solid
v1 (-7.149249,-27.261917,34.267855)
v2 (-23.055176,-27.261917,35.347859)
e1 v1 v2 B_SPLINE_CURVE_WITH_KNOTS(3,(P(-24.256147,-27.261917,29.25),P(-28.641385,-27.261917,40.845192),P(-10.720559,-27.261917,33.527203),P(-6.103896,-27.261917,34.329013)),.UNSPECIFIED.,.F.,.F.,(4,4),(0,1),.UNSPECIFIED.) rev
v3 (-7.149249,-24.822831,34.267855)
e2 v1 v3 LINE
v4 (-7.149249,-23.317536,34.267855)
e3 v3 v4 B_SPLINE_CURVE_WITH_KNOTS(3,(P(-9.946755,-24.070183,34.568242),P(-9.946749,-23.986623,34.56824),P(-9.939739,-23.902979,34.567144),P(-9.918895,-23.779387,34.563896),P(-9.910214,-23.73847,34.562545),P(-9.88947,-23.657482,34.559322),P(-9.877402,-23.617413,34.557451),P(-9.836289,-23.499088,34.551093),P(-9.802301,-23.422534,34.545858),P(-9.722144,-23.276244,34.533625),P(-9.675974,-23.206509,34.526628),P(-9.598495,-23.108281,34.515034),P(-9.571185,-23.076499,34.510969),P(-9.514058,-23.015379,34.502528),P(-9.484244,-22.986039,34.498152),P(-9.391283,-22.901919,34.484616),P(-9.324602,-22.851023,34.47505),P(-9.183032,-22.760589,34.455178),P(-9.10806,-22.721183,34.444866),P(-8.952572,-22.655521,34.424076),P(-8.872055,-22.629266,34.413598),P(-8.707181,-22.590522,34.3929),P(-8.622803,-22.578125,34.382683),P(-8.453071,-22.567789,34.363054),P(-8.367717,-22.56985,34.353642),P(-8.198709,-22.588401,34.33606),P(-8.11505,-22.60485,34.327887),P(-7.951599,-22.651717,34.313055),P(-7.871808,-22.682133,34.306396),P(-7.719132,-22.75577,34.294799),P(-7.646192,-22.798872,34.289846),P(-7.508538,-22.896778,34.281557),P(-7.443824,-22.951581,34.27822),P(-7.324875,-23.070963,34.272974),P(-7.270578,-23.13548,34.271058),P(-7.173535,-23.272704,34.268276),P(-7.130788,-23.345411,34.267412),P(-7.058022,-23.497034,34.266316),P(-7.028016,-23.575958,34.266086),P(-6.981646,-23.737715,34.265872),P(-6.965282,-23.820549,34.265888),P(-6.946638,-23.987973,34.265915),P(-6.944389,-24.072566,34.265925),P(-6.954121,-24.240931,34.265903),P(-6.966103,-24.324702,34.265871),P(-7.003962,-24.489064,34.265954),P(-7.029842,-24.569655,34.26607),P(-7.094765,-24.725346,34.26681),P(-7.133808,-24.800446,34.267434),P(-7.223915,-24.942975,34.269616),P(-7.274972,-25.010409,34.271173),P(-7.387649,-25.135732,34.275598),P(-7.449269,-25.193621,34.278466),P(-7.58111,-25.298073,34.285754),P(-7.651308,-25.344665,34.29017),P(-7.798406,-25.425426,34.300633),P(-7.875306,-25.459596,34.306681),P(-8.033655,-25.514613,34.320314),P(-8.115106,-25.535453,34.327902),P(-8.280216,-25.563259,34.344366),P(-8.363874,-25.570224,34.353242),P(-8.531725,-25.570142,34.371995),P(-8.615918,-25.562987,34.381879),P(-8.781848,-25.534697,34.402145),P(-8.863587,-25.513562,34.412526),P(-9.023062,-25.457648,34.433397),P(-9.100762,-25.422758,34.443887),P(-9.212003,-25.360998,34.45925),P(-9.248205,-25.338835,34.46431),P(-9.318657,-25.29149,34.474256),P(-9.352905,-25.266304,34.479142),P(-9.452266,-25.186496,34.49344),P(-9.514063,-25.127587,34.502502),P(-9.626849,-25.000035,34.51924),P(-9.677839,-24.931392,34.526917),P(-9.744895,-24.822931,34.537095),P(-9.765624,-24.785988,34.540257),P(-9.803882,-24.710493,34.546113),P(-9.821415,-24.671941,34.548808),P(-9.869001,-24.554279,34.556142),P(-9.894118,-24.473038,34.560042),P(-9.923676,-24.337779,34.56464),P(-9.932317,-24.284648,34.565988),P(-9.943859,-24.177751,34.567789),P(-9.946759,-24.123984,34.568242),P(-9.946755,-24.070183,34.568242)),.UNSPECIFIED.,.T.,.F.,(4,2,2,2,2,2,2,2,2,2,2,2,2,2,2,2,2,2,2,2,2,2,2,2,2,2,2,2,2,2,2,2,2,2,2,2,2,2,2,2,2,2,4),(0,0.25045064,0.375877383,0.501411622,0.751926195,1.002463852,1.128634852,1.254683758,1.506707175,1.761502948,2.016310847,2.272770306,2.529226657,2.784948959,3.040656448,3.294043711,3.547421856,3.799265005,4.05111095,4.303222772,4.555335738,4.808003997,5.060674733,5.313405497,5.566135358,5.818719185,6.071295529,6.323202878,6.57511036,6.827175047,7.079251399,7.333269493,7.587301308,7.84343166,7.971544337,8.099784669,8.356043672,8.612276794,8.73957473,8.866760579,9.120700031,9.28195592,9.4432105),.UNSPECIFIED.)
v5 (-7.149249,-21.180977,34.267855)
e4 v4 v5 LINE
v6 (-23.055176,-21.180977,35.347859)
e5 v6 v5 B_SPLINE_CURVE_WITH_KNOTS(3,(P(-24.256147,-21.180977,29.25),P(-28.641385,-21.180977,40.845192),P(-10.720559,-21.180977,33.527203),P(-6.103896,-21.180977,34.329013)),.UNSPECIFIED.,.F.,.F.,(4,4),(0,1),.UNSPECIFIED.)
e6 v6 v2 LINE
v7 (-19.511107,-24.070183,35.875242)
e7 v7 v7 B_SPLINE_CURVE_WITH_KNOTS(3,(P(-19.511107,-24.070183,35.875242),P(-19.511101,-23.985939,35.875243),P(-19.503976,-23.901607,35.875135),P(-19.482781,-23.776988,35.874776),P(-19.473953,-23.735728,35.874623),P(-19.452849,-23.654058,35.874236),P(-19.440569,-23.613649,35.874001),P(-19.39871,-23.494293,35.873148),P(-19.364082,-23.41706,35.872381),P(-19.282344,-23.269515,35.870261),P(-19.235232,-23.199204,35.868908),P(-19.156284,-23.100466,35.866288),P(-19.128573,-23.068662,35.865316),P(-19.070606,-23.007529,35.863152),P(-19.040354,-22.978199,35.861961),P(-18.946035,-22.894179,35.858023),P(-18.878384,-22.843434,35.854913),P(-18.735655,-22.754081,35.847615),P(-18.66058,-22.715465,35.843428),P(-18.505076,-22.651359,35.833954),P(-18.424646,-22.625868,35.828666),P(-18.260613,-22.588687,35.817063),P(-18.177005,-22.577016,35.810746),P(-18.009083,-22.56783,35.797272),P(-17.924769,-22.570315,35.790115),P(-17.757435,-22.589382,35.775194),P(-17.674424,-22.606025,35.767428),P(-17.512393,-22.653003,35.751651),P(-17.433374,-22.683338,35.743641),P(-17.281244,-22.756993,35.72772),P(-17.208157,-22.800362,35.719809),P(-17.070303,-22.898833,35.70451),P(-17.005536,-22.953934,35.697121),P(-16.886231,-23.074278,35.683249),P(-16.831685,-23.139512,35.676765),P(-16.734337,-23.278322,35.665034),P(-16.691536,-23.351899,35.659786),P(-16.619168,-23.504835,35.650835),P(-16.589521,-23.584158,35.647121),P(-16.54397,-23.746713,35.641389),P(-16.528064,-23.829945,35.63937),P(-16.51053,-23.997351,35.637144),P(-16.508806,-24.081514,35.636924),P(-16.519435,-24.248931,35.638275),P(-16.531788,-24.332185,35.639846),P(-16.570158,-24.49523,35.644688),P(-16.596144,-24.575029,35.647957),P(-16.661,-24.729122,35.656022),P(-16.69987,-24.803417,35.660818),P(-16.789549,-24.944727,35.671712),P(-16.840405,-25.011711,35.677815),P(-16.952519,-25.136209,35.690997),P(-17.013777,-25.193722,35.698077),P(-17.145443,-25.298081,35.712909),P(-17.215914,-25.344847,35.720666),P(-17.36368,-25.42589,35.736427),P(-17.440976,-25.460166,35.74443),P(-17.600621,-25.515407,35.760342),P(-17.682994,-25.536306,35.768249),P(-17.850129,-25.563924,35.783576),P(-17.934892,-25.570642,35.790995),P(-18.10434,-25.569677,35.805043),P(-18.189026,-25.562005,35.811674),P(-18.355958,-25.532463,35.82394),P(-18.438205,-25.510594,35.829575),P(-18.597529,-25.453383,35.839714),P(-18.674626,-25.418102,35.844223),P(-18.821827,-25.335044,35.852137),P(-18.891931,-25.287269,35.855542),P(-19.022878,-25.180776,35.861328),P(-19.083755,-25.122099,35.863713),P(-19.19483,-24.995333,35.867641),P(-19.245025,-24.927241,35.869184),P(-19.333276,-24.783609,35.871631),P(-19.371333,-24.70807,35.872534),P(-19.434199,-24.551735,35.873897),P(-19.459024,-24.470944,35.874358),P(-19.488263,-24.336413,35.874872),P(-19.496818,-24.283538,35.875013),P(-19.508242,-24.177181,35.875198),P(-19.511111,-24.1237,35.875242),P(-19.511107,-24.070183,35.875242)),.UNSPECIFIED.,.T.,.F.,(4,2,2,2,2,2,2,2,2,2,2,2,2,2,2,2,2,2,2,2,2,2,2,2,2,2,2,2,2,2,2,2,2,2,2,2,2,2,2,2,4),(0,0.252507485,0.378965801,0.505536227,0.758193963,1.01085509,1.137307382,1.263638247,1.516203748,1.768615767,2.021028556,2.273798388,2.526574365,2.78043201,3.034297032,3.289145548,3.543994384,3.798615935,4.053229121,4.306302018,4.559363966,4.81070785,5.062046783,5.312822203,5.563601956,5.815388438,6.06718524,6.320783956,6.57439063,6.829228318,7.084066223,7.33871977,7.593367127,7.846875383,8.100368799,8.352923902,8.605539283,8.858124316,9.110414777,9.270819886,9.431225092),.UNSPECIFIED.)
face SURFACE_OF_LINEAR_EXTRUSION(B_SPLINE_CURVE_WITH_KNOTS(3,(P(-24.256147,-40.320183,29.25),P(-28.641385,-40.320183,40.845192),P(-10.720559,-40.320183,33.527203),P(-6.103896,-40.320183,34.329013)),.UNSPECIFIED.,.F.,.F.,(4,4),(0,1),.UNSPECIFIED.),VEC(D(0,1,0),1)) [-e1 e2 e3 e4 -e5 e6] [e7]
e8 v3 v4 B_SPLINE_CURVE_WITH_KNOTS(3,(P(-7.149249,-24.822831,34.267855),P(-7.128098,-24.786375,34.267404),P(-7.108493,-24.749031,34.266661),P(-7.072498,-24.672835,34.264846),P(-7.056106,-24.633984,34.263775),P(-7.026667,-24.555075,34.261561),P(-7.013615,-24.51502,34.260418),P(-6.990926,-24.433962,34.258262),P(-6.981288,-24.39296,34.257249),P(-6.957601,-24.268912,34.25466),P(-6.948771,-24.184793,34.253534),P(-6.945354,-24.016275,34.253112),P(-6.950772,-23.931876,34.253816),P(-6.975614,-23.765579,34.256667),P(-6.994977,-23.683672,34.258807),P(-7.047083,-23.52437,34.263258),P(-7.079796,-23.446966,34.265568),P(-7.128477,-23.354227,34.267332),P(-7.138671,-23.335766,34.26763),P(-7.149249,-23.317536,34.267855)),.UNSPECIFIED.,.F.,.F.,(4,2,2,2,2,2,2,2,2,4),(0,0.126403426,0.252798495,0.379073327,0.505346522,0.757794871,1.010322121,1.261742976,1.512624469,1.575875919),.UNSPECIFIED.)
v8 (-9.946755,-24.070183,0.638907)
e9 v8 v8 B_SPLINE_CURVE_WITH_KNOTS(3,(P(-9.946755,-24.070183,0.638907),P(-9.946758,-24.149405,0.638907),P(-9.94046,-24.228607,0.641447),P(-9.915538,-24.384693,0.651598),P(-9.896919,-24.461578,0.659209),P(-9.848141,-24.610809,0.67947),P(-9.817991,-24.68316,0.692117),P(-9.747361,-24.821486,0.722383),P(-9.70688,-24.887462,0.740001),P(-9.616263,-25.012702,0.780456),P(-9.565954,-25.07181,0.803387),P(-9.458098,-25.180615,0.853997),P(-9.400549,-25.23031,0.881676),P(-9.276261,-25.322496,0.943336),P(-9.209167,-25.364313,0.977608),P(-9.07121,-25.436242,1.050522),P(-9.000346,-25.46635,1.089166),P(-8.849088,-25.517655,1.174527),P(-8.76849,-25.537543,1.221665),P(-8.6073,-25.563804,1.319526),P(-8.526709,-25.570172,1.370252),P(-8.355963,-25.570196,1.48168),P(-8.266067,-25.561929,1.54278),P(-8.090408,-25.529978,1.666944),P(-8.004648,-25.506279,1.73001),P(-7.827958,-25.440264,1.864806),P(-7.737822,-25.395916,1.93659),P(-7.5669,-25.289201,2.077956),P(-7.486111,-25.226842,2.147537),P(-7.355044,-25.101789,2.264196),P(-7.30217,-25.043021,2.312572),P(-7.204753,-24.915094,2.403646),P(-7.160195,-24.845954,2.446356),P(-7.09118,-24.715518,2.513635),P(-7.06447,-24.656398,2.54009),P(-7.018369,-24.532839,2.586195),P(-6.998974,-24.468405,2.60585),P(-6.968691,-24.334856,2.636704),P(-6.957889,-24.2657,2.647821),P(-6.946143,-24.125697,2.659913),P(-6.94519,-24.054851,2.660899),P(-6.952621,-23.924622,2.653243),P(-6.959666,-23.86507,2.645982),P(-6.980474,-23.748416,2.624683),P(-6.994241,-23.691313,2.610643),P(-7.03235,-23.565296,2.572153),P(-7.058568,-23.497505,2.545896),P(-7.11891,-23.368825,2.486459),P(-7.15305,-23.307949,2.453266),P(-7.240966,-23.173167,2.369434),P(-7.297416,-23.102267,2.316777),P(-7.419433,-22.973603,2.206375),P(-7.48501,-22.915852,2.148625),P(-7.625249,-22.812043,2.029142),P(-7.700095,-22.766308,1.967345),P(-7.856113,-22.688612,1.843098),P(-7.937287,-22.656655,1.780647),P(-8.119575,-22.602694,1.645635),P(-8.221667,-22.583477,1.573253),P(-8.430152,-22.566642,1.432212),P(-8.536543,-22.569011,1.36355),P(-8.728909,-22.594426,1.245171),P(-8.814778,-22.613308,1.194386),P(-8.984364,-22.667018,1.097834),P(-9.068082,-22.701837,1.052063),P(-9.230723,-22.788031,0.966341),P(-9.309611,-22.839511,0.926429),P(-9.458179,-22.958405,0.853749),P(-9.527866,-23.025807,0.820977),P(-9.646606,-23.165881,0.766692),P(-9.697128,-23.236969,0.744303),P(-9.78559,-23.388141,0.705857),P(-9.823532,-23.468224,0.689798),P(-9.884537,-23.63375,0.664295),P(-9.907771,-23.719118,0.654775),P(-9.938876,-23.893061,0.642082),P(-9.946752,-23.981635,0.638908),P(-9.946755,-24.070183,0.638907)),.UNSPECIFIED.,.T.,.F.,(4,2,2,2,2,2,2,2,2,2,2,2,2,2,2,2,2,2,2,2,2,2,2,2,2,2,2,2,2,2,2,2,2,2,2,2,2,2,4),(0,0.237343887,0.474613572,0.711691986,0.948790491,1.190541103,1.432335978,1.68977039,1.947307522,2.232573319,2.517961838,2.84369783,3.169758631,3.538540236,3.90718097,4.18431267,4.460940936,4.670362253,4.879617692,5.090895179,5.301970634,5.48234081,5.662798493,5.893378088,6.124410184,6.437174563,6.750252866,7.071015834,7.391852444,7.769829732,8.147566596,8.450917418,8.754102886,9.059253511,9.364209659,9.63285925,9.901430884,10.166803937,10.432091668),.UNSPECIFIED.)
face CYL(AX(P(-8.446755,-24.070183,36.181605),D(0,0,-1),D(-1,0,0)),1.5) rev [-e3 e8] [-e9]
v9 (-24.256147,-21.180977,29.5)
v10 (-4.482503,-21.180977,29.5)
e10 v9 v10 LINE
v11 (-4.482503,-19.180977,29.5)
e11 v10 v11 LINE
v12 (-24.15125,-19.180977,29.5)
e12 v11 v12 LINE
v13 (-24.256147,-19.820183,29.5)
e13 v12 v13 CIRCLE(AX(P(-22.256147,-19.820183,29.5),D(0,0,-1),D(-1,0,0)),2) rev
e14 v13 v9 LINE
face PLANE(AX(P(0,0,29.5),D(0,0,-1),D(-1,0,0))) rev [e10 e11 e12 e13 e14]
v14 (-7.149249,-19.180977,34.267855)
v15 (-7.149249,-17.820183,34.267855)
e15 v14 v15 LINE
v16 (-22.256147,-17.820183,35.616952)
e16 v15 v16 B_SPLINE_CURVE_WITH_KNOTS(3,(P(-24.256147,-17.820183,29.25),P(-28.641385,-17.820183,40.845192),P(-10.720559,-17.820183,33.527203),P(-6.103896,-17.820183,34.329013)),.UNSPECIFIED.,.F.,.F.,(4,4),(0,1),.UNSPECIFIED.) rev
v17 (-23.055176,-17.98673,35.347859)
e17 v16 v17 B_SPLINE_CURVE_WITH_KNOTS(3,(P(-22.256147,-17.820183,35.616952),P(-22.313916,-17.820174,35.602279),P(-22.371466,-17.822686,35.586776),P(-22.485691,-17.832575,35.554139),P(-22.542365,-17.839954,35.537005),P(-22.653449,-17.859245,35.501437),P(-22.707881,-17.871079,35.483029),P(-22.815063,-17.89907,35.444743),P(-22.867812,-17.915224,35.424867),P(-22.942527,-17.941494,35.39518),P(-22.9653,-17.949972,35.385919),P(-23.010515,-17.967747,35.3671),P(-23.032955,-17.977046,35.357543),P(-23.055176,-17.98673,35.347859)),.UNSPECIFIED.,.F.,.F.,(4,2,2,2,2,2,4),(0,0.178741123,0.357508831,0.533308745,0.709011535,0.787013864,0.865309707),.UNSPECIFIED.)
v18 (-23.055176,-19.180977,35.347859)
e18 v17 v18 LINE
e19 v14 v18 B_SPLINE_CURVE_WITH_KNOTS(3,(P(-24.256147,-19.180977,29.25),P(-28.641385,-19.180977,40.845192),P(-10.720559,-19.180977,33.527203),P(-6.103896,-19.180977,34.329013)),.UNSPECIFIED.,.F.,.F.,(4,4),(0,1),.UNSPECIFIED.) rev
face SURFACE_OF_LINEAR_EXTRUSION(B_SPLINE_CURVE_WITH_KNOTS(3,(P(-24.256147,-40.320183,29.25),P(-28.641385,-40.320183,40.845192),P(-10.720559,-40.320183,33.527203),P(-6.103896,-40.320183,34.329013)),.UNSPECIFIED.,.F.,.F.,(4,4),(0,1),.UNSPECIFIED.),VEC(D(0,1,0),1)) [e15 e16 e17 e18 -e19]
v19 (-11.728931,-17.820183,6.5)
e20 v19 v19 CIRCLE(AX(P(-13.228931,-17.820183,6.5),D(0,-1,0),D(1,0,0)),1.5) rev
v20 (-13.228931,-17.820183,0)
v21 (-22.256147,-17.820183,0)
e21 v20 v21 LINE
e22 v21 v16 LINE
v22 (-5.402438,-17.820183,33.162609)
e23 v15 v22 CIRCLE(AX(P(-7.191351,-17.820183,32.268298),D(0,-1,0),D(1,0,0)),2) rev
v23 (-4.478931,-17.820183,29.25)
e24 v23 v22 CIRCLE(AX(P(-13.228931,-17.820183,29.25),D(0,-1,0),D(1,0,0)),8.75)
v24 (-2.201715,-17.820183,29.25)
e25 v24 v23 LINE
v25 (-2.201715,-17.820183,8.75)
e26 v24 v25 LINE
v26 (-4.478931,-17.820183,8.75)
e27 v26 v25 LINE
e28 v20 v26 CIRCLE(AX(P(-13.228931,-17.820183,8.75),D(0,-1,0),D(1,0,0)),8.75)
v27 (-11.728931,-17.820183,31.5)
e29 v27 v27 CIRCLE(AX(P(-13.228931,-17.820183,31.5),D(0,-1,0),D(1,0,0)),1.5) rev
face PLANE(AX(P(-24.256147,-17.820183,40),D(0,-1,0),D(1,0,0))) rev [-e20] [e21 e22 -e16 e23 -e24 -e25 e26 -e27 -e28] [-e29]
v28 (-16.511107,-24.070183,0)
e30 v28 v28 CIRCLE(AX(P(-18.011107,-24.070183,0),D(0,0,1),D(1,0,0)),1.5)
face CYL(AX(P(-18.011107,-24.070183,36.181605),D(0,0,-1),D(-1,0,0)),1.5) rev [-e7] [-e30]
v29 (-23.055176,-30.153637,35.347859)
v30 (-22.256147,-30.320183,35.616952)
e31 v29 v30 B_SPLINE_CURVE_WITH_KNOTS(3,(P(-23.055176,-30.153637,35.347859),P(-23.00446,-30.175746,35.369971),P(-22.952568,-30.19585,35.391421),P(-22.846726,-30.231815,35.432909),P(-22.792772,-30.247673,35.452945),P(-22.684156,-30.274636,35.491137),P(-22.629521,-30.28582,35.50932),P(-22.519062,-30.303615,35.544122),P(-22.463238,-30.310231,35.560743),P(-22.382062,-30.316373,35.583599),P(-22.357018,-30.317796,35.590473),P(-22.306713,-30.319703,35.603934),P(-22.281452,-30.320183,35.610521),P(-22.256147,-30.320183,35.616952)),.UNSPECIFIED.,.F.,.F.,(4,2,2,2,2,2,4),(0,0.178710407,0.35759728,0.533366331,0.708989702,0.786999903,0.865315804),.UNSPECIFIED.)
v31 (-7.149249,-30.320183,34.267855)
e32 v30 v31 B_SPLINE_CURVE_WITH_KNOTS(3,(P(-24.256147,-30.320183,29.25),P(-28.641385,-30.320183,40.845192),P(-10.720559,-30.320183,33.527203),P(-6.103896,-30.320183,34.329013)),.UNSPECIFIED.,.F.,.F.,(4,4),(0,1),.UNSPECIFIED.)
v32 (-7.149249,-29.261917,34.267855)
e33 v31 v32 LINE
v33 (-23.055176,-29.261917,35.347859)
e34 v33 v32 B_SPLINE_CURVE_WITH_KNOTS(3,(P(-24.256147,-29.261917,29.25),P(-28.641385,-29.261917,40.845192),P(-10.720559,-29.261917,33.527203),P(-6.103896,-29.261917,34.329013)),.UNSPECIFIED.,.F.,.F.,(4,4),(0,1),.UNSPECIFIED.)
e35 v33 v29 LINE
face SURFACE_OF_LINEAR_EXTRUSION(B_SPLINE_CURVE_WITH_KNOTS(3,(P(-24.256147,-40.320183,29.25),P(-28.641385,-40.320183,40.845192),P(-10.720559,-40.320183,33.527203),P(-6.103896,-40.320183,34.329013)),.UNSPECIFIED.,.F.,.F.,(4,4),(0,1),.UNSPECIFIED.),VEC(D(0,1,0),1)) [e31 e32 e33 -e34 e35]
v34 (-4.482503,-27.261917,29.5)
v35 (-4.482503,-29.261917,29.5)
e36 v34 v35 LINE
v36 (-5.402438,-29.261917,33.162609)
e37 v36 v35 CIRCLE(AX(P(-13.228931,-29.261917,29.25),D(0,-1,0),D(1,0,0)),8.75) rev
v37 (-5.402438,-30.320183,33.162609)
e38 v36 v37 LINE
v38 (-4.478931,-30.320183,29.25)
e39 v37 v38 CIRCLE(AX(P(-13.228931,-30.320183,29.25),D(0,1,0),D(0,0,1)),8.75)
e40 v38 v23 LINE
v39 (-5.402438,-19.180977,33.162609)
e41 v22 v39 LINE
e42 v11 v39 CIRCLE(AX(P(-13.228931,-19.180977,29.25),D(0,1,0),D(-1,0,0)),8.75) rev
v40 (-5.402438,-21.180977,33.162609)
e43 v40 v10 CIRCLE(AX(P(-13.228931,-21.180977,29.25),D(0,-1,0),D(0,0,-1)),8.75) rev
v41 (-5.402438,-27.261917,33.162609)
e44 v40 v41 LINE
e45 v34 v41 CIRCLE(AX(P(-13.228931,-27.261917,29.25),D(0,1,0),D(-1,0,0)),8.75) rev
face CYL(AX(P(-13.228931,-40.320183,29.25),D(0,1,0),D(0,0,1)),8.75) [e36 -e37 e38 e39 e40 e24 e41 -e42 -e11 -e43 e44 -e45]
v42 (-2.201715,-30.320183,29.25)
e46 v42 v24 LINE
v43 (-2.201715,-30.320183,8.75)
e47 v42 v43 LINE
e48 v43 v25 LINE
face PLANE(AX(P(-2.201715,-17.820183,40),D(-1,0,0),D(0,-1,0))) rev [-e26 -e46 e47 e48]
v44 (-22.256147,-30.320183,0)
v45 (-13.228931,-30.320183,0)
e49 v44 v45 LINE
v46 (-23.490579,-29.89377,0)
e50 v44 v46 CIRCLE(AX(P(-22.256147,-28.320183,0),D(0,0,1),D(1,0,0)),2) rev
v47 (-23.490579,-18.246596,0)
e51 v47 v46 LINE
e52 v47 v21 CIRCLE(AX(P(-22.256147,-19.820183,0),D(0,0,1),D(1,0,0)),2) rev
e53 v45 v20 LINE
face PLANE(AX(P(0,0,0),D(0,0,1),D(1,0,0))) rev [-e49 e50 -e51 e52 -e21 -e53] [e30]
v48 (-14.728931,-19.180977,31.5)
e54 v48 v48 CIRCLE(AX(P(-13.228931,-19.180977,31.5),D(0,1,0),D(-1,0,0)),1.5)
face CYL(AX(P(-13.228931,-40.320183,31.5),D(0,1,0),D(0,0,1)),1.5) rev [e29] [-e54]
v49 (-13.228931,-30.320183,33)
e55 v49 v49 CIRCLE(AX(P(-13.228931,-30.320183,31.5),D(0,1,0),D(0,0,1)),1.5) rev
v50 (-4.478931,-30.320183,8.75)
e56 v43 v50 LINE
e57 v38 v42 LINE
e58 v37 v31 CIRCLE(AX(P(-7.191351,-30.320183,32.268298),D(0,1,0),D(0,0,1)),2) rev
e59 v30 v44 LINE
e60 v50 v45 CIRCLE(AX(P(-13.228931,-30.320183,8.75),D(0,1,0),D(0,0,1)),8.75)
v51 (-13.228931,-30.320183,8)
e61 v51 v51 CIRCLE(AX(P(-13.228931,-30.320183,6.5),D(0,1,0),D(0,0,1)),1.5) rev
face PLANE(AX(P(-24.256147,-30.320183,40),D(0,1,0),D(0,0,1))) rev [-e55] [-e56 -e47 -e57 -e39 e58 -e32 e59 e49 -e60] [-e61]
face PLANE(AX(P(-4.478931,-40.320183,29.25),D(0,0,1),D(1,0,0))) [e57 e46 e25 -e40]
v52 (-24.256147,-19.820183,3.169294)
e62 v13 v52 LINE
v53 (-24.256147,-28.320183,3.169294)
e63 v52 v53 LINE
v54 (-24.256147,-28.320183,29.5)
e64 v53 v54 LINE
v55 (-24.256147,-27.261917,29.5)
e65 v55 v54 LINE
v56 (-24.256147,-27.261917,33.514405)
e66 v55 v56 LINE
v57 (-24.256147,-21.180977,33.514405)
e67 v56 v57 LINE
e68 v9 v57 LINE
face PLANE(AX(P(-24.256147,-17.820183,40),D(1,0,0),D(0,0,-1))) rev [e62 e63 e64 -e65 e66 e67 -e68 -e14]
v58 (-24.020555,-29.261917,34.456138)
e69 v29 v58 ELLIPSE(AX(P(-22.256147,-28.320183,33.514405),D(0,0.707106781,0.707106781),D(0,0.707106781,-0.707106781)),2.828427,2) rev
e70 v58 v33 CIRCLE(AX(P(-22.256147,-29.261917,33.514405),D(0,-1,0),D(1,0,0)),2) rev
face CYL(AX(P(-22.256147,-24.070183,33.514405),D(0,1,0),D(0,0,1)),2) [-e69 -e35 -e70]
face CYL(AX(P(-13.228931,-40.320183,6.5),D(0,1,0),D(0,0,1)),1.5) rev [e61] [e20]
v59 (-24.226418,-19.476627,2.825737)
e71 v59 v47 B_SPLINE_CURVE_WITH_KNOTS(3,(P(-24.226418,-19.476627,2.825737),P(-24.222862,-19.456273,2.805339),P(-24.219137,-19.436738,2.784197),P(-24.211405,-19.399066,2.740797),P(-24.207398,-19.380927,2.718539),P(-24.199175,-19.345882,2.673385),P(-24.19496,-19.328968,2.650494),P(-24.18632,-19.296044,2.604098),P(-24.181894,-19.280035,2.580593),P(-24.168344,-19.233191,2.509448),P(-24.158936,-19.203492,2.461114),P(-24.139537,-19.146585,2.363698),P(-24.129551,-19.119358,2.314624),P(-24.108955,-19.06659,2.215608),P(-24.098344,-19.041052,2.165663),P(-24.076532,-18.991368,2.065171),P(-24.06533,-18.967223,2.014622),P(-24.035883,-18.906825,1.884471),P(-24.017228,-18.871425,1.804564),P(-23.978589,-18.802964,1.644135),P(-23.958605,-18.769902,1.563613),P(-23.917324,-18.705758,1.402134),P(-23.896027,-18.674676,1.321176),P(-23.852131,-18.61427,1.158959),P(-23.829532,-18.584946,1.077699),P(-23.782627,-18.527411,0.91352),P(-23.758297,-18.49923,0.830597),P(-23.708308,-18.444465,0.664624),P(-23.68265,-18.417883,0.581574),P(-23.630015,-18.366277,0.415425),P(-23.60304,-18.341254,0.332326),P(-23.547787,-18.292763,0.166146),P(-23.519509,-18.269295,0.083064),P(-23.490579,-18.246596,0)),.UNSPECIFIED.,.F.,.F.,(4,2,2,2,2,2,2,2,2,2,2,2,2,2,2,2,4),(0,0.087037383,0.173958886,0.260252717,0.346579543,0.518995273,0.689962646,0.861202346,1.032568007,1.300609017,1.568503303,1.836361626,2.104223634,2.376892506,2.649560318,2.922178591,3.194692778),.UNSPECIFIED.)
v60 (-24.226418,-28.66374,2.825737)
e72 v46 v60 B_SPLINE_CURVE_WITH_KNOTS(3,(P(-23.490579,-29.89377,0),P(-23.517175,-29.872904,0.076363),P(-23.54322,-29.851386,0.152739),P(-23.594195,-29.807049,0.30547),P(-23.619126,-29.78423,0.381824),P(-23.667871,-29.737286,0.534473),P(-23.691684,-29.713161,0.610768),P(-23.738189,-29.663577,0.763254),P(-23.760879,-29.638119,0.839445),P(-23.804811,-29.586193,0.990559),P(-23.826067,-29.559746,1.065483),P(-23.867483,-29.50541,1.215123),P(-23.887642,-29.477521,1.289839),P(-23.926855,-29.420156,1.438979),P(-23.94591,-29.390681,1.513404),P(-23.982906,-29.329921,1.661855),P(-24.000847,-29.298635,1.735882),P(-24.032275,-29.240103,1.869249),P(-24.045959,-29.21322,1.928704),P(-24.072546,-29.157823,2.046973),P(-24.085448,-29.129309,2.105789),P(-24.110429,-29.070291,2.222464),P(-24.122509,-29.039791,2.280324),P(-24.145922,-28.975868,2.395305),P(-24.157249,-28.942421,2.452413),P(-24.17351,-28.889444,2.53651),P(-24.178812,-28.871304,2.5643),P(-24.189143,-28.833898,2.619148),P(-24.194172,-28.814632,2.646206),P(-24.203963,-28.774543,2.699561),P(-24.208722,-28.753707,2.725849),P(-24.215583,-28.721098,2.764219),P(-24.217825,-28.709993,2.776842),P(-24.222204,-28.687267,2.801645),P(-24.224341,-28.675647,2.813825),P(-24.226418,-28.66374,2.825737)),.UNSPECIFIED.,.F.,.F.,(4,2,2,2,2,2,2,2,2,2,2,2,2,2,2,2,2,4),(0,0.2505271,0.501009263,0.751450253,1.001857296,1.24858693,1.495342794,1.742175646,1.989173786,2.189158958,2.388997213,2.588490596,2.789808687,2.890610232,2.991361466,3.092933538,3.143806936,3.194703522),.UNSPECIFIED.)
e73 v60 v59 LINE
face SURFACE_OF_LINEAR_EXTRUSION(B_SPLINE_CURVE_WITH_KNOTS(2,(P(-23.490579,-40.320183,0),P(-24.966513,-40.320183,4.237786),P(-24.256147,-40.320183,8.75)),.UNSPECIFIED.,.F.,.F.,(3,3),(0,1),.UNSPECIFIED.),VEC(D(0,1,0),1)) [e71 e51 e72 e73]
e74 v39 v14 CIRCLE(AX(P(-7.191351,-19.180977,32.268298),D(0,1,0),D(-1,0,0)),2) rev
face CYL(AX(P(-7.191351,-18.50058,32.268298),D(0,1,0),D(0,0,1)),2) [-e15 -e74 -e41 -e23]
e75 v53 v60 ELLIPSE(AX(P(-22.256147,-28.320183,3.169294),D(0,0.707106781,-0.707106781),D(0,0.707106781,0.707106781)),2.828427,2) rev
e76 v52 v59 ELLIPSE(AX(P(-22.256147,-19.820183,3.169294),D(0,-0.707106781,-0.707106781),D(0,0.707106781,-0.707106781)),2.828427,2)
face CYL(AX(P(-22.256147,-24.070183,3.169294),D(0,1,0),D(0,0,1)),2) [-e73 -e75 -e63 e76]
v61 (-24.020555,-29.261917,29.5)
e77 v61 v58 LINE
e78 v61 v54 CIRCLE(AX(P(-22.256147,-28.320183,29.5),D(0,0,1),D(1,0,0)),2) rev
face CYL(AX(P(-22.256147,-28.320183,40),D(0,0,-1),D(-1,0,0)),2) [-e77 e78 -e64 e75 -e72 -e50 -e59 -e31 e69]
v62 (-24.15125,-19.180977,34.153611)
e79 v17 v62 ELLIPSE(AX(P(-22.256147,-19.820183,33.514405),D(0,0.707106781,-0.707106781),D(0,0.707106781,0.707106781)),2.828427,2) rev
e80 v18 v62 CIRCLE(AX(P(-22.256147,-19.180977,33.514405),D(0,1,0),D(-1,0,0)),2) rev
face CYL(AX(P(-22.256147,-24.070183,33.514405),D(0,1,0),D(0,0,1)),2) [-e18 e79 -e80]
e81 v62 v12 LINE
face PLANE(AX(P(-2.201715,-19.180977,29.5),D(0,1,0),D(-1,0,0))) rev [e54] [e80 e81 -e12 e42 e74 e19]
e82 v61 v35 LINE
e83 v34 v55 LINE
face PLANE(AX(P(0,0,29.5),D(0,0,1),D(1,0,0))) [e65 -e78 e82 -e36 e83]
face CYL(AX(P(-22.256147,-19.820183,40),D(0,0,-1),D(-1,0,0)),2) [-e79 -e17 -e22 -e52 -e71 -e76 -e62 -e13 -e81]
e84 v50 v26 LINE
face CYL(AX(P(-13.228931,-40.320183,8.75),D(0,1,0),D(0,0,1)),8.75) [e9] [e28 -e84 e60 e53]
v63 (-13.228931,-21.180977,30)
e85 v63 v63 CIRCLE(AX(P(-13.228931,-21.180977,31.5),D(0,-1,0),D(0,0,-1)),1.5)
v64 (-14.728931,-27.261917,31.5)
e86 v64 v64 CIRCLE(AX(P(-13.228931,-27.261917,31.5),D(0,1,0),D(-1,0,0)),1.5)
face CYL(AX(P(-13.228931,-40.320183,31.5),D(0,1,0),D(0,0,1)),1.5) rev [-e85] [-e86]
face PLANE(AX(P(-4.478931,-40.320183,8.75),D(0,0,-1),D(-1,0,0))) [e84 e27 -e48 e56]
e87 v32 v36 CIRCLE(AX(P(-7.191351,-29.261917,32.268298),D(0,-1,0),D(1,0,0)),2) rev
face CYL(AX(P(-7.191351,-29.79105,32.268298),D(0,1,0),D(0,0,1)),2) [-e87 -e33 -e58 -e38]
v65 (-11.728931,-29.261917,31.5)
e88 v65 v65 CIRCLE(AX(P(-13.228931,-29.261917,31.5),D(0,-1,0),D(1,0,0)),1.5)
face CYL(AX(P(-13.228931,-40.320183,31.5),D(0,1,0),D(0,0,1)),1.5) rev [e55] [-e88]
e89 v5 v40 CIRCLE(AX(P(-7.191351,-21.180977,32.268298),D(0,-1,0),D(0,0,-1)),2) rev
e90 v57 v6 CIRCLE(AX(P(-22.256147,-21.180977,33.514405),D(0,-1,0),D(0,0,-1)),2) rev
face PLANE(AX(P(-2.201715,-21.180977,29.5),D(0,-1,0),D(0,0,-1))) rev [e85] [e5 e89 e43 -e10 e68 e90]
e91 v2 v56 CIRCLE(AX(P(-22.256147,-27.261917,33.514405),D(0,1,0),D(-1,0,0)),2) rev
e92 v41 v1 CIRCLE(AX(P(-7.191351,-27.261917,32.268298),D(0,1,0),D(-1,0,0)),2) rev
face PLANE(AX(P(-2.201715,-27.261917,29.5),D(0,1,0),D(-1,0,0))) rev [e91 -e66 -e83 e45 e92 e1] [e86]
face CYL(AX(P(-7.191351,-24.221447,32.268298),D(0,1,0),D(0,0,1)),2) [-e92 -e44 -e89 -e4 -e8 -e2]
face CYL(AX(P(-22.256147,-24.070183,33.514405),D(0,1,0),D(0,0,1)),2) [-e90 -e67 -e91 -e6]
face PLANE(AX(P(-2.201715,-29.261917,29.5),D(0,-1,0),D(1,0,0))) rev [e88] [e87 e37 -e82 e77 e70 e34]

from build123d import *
from OCP.BRepAlgoAPI import BRepAlgoAPI_Cut
from OCP.TopTools import TopTools_ListOfShape

# Parameters (mm, degrees)
SKETCH1_W               = 22.054431489
SKETCH1_H               = 12.5
BOSS_EXTRUDE1_DEPTH     = 40
CUT_EXTRUDE1_DEPTH      = 10
CUT_EXTRUDE1_DEPTH_BACK = 15
SKETCH2_R               = 1.5
FILLET3_START           = -1
FILLET3_DEPTH           = 36.616951747
FILLET3_START_2         = -31
FILLET3_2_DEPTH         = 14
SKETCH5_R               = 1.5
CUT_EXTRUDE4_DEPTH      = 53.866443736
SKETCH16_W              = 22.05443149
SKETCH16_H              = 2
CUT_EXTRUDE6_DEPTH      = 8.5
FILLET4_R               = 2


with BuildPart() as part:
    # Sketch1 → Boss-Extrude1 (new body)
    with BuildSketch(Plane.XY):
        with Locations((-13.228930986, -24.070183414)):
            Rectangle(SKETCH1_W, SKETCH1_H)
    extrude(amount=BOSS_EXTRUDE1_DEPTH)

    # Sketch2 → Cut-Extrude1 (cut, two sides: drawn at the far end of the back side and taken through both)
    with BuildSketch(Plane.XZ.offset(30.320183414).offset(-CUT_EXTRUDE1_DEPTH_BACK)):
        with Locations(Location((-13.228930986, 6.5, 0), (0, 0, 90))):
            Circle(SKETCH2_R)
        with Locations(Location((-13.228930986, 31.5, 0), (0, 0, 90))):
            Circle(SKETCH2_R)
        with BuildLine():
            Line((-4.478930986, 29.25), (-2.201715242, 29.25))
            add(Edge.make_bspline(
                [(-24.256146731, 29.25), (-34.277912729, 38.417119108), (-13.227499763, 50.308047167), (7.840407292, 38.416977249), (-2.201715242, 29.25)],
                knots=[0, 0, 0, 0, 0.49986218, 1, 1, 1, 1], degree=3))
            add(Edge.make_bspline(
                [(-6.103895584, 34.329012749), (-10.720559386, 33.527203043), (-28.641384523, 40.845191705), (-24.256146731, 29.25)],
                knots=[0, 0, 0, 0, 1, 1, 1, 1], degree=3))
            ThreePointArc((-6.103895584, 34.329012749), (-4.895067543, 31.916312081), (-4.478930986, 29.25))
        make_face()
        with BuildLine():
            Line((-4.478930986, 8.75), (-2.201715242, 8.75))
            add(Edge.make_bspline(
                [(-2.201715242, 8.75), (5.39210746, 3.880294823), (-0.777052631, -4.523329032), (-17.174300591, -10.623347238), (-34.821400648, -0.026005424), (-24.256146731, 8.75)],
                knots=[0, 0, 0, 0, 0.283272691, 0.504244858, 1, 1, 1, 1], degree=3))
            add(Edge.make_bspline(
                [(-23.490579314, 0), (-24.966512963, 4.237786421), (-24.256146731, 8.75)],
                knots=[0, 0, 0, 1, 1, 1], degree=2))
            Line((-23.490579314, 0), (-13.228930986, 0))
            ThreePointArc((-13.228930986, 0), (-7.041746651, 2.562815665), (-4.478930986, 8.75))
        make_face()
    extrude(amount=CUT_EXTRUDE1_DEPTH + CUT_EXTRUDE1_DEPTH_BACK, mode=Mode.SUBTRACT)


with BuildPart() as fillet3_tool:
    # Fillet3: read off the stored shape, not the designer's step
    # Fillet3 outline → Fillet3 (new body)
    with BuildSketch(Plane.XY.offset(FILLET3_START)):
        with BuildLine():
            Line((-24.256146731, -17.820183414), (-24.256146731, -19.820183414))
            ThreePointArc((-24.256146731, -19.820183414), (-23.670360293, -18.405969851), (-22.256146731, -17.820183414))
            Line((-22.256146731, -17.820183414), (-24.256146731, -17.820183414))
        make_face()
        with BuildLine():
            ThreePointArc((-22.256146731, -30.320183414), (-23.670360293, -29.734396976), (-24.256146731, -28.320183414))
            Line((-24.256146731, -28.320183414), (-24.256146731, -30.320183414))
            Line((-24.256146731, -30.320183414), (-22.256146731, -30.320183414))
        make_face()
    extrude(amount=FILLET3_DEPTH)


with BuildPart() as part_1:
    add(part.part)

    # Fillet3: cut by fillet3_tool, with a tolerance
    fillet3_stock = TopTools_ListOfShape()
    fillet3_stock.Append(part_1.part.wrapped)
    fillet3_tools = TopTools_ListOfShape()
    fillet3_tools.Append(fillet3_tool.part.wrapped)
    fillet3_cut = BRepAlgoAPI_Cut()
    fillet3_cut.SetArguments(fillet3_stock)
    fillet3_cut.SetTools(fillet3_tools)
    fillet3_cut.SetFuzzyValue(0.00001)
    fillet3_cut.Build()
    add(Compound.cast(fillet3_cut.Shape()).solids(), mode=Mode.REPLACE)


with BuildPart() as fillet3_2_tool:
    # Fillet3 2 outline → Fillet3 2 (new body)
    with BuildSketch(Plane(origin=(0, 0, 0), x_dir=(1, 0, 0), z_dir=(0, 1, 0)).offset(FILLET3_START_2)):
        with BuildLine():
            Line((-24.256146731, -3.001504812), (-24.256146731, -3.16929397))
            ThreePointArc((-24.256146731, -3.16929397), (-24.248700679, -2.996873655), (-24.226417966, -2.82573719))
            add(Edge.make_bspline(
                [(-24.226417966, -2.82573719), (-24.241732441, -2.913564505), (-24.256146731, -3.001504812)],
                knots=[0.329874436, 0.329874436, 0.329874436, 0.350165787, 0.350165787, 0.350165787], degree=2))
        make_face()
        with BuildLine():
            ThreePointArc((-23.055175533, -35.347858737), (-23.929176558, -34.610293214), (-24.256146731, -33.5144049))
            Line((-24.256146731, -33.5144049), (-24.256146731, -34.486377393))
            add(Edge.make_bspline(
                [(-24.256146731, -34.486377393), (-23.945543724, -34.85491353), (-23.538709887, -35.137131928), (-23.055175533, -35.347858737)],
                knots=[0.223074816, 0.223074816, 0.223074816, 0.223074816, 0.304929745, 0.304929745, 0.304929745, 0.304929745], degree=3))
        make_face()
    extrude(amount=FILLET3_2_DEPTH)


with BuildPart() as part_2:
    add(part_1.part)

    # Fillet3 2: cut by fillet3_2_tool, with a tolerance
    fillet3_2_stock = TopTools_ListOfShape()
    fillet3_2_stock.Append(part_2.part.wrapped)
    fillet3_2_tools = TopTools_ListOfShape()
    fillet3_2_tools.Append(fillet3_2_tool.part.wrapped)
    fillet3_2_cut = BRepAlgoAPI_Cut()
    fillet3_2_cut.SetArguments(fillet3_2_stock)
    fillet3_2_cut.SetTools(fillet3_2_tools)
    fillet3_2_cut.SetFuzzyValue(0.00001)
    fillet3_2_cut.Build()
    add(Compound.cast(fillet3_2_cut.Shape()).solids(), mode=Mode.REPLACE)

    # Sketch5 → Cut-Extrude4 (cut, through all)
    with BuildSketch(Plane.XY):
        with Locations(Location((-18.011106811, -24.070183414, 0), (0, 0, 180))):
            Circle(SKETCH5_R)
        with Locations(Location((-8.446755162, -24.070183414, 0), (0, 0, 180))):
            Circle(SKETCH5_R)
    extrude(amount=CUT_EXTRUDE4_DEPTH, mode=Mode.SUBTRACT)

    # Sketch16 → Cut-Extrude6 (cut)
    with BuildSketch(Plane.XY.offset(38)):
        with Locations((-13.228930985, -20.1809771)):
            Rectangle(SKETCH16_W, SKETCH16_H)
        with Locations((-13.228930985, -28.261916897)):
            Rectangle(SKETCH16_W, SKETCH16_H)
    extrude(amount=-CUT_EXTRUDE6_DEPTH, mode=Mode.SUBTRACT)

    # Fillet4
    # the kernel refuses this fillet: 2 mm, written as the material it takes off along each edge
    with BuildSketch(Plane(origin=(-6.103895584, -22.583679851, 34.329012749), x_dir=(0.5153680546007453, 0, -0.8569689424343471), z_dir=(0, 1, 0))) as fillet4_piece_1:
        with BuildLine():
            CenterArc((1.205528974, 1.993941708), FILLET4_R, 212.228268917, 62.232476225)
            Line((-0.486331325, 0.927354287), (-0.520168531, 0.906022538))
            ThreePointArc((-0.520168531, 0.906022538), (-0.25689069, 0.456334761), (-0.037300681, -0.01444504))
            Line((-0.037300681, -0.01444504), (-0.003111043, -0.039878834))
            ThreePointArc((-0.003111043, -0.039878834), (0.68054055, -0.066505026), (1.364192143, -0.039878834))
            Line((1.364192143, -0.039878834), (1.3610811, 0))
        make_face()
    extrude(amount=8.166199187, mode=Mode.SUBTRACT)
    with BuildSketch(Plane(origin=(-6.103895584, -30.664619647, 34.329012749), x_dir=(0.5153680546007453, 0, -0.8569689424343471), z_dir=(0, 1, 0))) as fillet4_piece_2:
        with BuildLine():
            CenterArc((1.205528974, 1.993941708), FILLET4_R, 212.228268917, 62.232476225)
            Line((-0.486331325, 0.927354287), (-0.520168531, 0.906022538))
            ThreePointArc((-0.520168531, 0.906022538), (-0.25689069, 0.456334761), (-0.037300681, -0.01444504))
            Line((-0.037300681, -0.01444504), (-0.003111043, -0.039878834))
            ThreePointArc((-0.003111043, -0.039878834), (0.68054055, -0.066505026), (1.364192143, -0.039878834))
            Line((1.364192143, -0.039878834), (1.3610811, 0))
        make_face()
    extrude(amount=12.886345297, mode=Mode.SUBTRACT)
    with BuildSketch(Plane(origin=(-6.103895584, -33.722886164, 34.329012749), x_dir=(0.5153680546007453, 0, -0.8569689424343471), z_dir=(0, 1, 0))) as fillet4_piece_3:
        with BuildLine():
            CenterArc((1.205528974, 1.993941708), FILLET4_R, 212.228268917, 62.232476225)
            Line((-0.486331325, 0.927354287), (-0.520168531, 0.906022538))
            ThreePointArc((-0.520168531, 0.906022538), (-0.25689069, 0.456334761), (-0.037300681, -0.01444504))
            Line((-0.037300681, -0.01444504), (-0.003111043, -0.039878834))
            ThreePointArc((-0.003111043, -0.039878834), (0.68054055, -0.066505026), (1.364192143, -0.039878834))
            Line((1.364192143, -0.039878834), (1.3610811, 0))
        make_face()
    extrude(amount=7.863672018, mode=Mode.SUBTRACT)


solid = part_2.part
